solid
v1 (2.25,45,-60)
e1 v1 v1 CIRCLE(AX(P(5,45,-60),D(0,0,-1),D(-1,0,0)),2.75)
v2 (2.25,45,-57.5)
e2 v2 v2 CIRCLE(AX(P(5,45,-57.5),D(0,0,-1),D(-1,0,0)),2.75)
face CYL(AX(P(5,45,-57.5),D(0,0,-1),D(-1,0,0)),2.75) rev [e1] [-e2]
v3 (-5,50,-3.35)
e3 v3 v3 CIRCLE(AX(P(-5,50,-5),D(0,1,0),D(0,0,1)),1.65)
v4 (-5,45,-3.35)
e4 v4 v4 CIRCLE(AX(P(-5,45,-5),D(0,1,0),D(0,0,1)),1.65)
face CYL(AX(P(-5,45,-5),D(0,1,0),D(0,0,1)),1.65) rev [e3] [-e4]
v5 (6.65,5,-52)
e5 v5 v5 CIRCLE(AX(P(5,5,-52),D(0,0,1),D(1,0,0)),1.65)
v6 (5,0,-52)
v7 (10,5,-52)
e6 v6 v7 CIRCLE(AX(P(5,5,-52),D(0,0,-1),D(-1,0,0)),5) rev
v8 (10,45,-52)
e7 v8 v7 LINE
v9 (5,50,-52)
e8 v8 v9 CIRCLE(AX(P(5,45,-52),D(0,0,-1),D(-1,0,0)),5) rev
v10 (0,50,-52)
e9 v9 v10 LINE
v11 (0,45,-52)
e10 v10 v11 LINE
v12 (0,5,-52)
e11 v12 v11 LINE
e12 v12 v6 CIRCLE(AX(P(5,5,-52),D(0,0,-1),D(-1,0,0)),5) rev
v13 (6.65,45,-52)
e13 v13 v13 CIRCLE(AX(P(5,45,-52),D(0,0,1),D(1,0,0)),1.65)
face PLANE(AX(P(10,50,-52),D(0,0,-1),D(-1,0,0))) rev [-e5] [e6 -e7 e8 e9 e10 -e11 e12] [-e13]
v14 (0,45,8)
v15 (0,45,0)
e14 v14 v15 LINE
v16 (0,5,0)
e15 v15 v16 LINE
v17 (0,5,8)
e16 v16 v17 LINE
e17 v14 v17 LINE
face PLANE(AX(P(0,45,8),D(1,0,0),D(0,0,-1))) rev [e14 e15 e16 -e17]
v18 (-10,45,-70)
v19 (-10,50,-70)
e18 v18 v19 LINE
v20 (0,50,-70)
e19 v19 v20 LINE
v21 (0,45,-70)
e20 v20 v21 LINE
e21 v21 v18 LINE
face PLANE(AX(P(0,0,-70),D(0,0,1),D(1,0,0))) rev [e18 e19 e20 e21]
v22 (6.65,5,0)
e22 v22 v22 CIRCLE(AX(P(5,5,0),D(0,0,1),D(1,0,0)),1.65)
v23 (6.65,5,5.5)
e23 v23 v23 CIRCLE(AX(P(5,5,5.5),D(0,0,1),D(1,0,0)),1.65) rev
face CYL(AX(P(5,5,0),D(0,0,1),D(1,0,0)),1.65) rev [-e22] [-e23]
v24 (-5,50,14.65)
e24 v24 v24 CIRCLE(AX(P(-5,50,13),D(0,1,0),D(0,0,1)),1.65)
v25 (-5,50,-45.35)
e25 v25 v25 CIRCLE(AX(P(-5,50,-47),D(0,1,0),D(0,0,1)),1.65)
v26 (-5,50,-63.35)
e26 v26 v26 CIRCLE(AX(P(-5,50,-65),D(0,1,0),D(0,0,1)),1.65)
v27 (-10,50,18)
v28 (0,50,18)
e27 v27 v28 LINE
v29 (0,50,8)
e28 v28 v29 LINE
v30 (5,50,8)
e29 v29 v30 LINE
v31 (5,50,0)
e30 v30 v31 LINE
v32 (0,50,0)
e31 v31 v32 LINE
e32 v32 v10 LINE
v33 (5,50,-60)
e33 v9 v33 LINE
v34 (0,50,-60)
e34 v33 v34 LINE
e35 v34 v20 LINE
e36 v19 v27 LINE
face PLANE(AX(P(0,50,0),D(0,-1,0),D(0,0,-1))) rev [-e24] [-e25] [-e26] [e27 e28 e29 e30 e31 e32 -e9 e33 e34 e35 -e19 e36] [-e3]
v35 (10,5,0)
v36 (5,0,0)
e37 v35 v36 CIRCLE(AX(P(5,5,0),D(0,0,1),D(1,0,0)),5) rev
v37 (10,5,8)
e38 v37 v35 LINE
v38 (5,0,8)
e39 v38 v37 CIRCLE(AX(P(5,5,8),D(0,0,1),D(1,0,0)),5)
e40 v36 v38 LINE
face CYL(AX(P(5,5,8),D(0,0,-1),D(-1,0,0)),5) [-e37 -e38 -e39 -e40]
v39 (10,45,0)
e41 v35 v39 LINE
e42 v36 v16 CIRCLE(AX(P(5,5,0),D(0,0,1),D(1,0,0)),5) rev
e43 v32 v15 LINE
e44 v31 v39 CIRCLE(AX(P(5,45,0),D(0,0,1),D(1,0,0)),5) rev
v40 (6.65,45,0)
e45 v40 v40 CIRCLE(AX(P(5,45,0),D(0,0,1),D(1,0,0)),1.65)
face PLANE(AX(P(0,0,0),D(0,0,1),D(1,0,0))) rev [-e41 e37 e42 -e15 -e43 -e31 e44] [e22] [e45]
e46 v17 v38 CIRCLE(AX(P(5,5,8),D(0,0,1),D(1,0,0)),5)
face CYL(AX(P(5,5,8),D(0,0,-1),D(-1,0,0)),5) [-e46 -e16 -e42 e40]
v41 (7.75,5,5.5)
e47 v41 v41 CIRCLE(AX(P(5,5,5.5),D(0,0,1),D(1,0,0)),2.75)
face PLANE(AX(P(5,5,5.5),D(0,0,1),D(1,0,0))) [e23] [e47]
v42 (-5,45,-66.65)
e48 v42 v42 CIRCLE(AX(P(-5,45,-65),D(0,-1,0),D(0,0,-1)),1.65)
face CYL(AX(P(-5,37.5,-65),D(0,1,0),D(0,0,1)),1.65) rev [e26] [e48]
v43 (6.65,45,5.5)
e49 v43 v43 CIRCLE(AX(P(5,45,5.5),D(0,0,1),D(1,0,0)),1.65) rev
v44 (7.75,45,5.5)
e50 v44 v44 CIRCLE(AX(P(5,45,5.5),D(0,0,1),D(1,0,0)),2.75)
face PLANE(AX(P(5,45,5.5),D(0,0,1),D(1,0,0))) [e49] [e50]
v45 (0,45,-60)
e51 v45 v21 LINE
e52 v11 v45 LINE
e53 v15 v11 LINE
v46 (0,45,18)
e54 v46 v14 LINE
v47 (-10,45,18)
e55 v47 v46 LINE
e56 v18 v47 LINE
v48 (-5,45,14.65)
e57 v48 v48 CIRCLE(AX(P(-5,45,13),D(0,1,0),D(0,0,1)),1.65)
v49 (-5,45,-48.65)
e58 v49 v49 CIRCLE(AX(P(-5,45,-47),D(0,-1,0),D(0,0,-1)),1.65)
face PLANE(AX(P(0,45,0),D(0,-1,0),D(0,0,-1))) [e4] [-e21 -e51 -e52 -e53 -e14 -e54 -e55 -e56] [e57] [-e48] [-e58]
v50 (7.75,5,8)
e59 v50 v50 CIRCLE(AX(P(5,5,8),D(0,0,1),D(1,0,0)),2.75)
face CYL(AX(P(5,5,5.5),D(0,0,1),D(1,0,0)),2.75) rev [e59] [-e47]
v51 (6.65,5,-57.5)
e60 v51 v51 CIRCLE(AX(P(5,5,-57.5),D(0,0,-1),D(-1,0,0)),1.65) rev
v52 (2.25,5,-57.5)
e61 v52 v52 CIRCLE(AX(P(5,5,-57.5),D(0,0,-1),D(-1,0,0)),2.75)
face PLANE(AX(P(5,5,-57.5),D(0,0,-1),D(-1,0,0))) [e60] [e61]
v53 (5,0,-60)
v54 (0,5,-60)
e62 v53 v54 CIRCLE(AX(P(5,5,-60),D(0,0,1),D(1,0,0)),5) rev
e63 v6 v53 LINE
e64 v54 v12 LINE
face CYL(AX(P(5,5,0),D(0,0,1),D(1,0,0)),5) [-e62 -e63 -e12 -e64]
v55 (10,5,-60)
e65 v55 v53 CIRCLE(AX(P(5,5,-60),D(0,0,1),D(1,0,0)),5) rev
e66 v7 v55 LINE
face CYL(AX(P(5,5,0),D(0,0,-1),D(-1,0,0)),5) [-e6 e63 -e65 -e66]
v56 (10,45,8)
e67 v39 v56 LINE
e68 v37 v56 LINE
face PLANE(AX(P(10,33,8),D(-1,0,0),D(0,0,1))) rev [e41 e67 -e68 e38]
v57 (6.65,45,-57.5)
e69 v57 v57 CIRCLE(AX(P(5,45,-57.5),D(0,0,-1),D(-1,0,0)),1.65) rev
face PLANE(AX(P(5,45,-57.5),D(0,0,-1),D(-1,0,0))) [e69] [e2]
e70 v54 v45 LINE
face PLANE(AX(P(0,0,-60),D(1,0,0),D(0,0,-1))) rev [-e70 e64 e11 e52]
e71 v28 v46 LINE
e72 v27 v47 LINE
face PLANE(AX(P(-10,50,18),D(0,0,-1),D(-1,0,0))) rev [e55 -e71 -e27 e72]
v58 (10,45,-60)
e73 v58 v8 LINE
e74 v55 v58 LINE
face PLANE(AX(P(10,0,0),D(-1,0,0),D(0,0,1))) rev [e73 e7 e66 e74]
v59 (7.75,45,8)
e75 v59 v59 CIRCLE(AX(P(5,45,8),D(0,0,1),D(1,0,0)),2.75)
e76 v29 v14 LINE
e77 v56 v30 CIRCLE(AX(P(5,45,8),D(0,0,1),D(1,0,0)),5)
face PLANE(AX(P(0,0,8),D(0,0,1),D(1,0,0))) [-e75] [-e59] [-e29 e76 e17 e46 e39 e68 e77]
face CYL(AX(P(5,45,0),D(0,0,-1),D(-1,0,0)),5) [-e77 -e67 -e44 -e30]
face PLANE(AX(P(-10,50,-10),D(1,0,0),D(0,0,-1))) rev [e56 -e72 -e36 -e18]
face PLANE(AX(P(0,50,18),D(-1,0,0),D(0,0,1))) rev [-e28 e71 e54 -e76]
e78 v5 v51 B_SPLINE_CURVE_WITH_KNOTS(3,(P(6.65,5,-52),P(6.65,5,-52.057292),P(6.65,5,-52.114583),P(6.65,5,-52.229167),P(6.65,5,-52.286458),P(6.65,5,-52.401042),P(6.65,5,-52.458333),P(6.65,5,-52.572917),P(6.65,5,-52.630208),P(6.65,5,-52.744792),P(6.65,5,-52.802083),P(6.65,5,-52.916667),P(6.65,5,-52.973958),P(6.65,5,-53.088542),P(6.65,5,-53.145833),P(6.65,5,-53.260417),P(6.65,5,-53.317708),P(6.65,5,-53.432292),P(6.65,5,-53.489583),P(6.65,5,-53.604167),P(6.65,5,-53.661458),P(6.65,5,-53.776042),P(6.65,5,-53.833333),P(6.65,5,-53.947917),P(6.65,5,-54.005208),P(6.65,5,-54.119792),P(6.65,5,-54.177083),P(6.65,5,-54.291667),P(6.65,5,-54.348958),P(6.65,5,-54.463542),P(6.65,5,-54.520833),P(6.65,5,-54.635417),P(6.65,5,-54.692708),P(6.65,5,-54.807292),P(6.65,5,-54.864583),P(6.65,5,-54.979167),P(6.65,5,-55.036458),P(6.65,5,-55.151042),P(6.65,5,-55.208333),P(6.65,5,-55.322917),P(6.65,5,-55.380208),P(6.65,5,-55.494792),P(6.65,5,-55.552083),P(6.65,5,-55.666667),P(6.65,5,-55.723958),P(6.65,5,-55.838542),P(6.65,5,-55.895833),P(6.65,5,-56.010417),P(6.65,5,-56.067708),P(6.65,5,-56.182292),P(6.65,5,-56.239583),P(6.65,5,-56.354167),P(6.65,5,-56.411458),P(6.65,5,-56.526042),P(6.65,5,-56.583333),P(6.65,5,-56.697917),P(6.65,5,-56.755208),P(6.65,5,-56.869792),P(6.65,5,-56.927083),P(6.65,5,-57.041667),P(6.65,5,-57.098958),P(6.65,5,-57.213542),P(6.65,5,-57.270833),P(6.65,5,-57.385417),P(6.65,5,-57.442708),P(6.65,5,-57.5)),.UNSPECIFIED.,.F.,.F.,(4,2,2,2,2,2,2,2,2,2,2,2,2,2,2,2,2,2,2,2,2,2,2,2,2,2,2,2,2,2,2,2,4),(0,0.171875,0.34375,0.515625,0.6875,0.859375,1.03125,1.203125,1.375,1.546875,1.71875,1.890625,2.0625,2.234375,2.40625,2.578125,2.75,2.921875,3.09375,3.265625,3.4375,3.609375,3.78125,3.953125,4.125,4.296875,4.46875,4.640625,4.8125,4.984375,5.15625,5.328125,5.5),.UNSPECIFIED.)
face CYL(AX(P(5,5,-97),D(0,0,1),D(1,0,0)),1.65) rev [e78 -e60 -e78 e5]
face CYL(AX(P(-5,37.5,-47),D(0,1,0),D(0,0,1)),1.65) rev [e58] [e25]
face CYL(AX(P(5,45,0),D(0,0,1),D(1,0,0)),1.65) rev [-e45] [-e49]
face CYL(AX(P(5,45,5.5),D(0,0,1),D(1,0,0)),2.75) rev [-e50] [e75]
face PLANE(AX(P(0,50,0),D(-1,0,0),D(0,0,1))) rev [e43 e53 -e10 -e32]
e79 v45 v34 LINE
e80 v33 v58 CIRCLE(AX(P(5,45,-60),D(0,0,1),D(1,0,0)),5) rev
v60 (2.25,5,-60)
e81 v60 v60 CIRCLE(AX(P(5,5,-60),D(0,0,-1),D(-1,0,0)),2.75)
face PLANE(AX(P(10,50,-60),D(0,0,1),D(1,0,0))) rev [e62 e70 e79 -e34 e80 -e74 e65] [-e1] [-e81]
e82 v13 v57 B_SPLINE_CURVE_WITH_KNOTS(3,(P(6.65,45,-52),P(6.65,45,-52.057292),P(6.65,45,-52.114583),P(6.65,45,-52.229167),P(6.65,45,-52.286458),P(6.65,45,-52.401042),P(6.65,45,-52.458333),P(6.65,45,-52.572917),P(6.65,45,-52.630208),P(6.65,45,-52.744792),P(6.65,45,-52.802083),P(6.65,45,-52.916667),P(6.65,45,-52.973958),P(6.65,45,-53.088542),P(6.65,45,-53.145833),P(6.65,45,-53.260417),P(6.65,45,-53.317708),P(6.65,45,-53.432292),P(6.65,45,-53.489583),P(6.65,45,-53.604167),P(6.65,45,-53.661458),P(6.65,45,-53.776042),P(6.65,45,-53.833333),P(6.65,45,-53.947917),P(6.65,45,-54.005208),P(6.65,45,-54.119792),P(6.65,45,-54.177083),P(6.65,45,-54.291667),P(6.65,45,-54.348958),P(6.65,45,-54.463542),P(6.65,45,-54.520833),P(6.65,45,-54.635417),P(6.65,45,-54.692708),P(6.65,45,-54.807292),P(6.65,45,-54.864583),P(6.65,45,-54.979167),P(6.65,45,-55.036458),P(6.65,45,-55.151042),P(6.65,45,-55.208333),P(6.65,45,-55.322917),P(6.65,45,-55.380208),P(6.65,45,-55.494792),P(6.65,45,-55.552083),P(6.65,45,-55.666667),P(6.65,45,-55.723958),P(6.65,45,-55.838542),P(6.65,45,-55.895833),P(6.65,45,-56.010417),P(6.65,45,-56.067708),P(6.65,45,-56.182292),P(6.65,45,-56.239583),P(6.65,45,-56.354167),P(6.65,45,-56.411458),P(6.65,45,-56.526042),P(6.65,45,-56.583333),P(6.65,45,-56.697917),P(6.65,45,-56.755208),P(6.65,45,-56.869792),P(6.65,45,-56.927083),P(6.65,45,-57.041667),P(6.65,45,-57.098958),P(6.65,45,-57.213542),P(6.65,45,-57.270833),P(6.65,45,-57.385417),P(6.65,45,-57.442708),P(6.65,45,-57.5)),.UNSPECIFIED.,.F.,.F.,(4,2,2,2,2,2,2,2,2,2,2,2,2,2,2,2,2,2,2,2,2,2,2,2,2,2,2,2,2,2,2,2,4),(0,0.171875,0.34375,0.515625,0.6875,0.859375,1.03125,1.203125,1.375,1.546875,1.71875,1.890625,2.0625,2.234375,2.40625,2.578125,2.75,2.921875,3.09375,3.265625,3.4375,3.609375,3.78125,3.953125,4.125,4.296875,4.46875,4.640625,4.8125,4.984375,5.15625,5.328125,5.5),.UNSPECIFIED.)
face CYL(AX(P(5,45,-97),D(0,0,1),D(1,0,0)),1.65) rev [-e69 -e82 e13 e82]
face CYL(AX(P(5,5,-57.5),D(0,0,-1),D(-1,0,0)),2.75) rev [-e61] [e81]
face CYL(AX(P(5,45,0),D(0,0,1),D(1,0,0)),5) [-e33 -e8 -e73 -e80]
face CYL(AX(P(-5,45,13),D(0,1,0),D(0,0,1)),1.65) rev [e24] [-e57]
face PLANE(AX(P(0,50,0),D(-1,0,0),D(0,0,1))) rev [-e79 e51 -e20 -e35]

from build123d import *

# Parameters (mm, degrees)
P_IDAT_VYSUNUT_M1_DEPTH  = 8
SKICA2_R                 = 1.65
ODEBRAT_VYSUNUT_M1_DEPTH = 47.786750261
P_IDAT_VYSUNUT_M2_DEPTH  = 5
SKICA4_R                 = 1.65
ODEBRAT_VYSUNUT_M2_DEPTH = 5
SKICA5_R                 = 1.65
ODEBRAT_VYSUNUT_M3_DEPTH = 55.074023338
ZAOBLIT1_R               = 5
SKICA6_W                 = 2
SKICA6_H                 = 23
P_IDAT_VYSUNUT_M3_DEPTH  = 8
SKICA7_R                 = 2.75
ODEBRAT_VYSUNUT_M4_DEPTH = 2.5
SKICA8_W                 = 10
SKICA8_H                 = 5
P_IDAT_VYSUNUT_M4_DEPTH  = 60
SKICA9_W                 = 8
SKICA9_H                 = 5
P_IDAT_VYSUNUT_M5_DEPTH  = 10
SKICA10_W                = 10
SKICA10_H                = 8
P_IDAT_VYSUNUT_M6_DEPTH  = 45
ZAOBLIT2_R               = 5
SKICA11_R                = 1.65
ODEBRAT_VYSUNUT_M5_DEPTH = 45
ODEBRAT_START            = -2.5
SKICA12_R                = 2.75
ODEBRAT_VYSUNUT_M6_DEPTH = 2.5
SKICA13_R                = 1.65
ODEBRAT_VYSUNUT_M7_DEPTH = 12.5


with BuildPart() as part:
    # Skica1 → Přidat vysunutím1 (new body)
    with BuildSketch(Plane.XY):
        Polygon((0, 0), (10, 0), (10, 10), (8, 10), (8, 33), (10, 33), (10, 45), (0, 45), align=None)
    extrude(amount=P_IDAT_VYSUNUT_M1_DEPTH)

    # Skica2 → Odebrat vysunutím1 (cut, through all)
    with BuildSketch(Plane.XY.offset(8)):
        with Locations((5, 45)):
            Circle(SKICA2_R)
        with Locations((5, 5)):
            Circle(SKICA2_R)
    extrude(amount=-ODEBRAT_VYSUNUT_M1_DEPTH, mode=Mode.SUBTRACT)

    # Skica3 → Přidat vysunutím2 (add)
    with BuildSketch(Plane(origin=(0, 45, 0), x_dir=(1, 0, 0), z_dir=(0, 1, 0))):
        Polygon((0, 0), (0, 10), (-10, 10), (-10, -18), (0, -18), (0, -8), (10, -8), (10, 0), align=None)
    extrude(amount=P_IDAT_VYSUNUT_M2_DEPTH)

    # Skica4 → Odebrat vysunutím2 (cut)
    with BuildSketch(Plane(origin=(0, 50, 0), x_dir=(1, 0, 0), z_dir=(0, 1, 0))):
        with Locations(Location((-5, 5, 0), (0, 0, 270))):
            Circle(SKICA4_R)
        with Locations(Location((-5, -13, 0), (0, 0, 270))):
            Circle(SKICA4_R)
    extrude(amount=-ODEBRAT_VYSUNUT_M2_DEPTH, mode=Mode.SUBTRACT)

    # Skica5 → Odebrat vysunutím3 (cut, through all)
    with BuildSketch(Plane.XY.offset(8)):
        with Locations((5, 45)):
            Circle(SKICA5_R)
    extrude(amount=-ODEBRAT_VYSUNUT_M3_DEPTH, mode=Mode.SUBTRACT)

    # Zaoblit1
    zaoblit1_edges = [part.edges().sort_by_distance(p)[0] for p in [
        (0, 0, 4),
        (10, 0, 4),
        (10, 50, 4),
    ]]
    fillet(zaoblit1_edges, radius=ZAOBLIT1_R - 0.0001)  # a hair under: the kernel refuses the full size

    # Skica6 → Přidat vysunutím3 (add)
    with BuildSketch(Plane.XY.offset(8)):
        with Locations((9, 21.5)):
            Rectangle(SKICA6_W, SKICA6_H)
    extrude(amount=-P_IDAT_VYSUNUT_M3_DEPTH)

    # Skica7 → Odebrat vysunutím4 (cut)
    with BuildSketch(Plane.XY.offset(8)):
        with Locations((5, 5)):
            Circle(SKICA7_R)
        with Locations((5, 45)):
            Circle(SKICA7_R)
    extrude(amount=-ODEBRAT_VYSUNUT_M4_DEPTH, mode=Mode.SUBTRACT)

    # Skica8 → Přidat vysunutím4 (add)
    with BuildSketch(Plane(origin=(0, 0, -10), x_dir=(-1, 0, 0), z_dir=(0, 0, -1))):
        with Locations((5, 47.5)):
            Rectangle(SKICA8_W, SKICA8_H)
    extrude(amount=P_IDAT_VYSUNUT_M4_DEPTH)

    # Skica9 → Přidat vysunutím5 (add)
    with BuildSketch(Plane(origin=(0, 0, 0), x_dir=(0, 0, -1), z_dir=(1, 0, 0))):
        with Locations((56, 47.5)):
            Rectangle(SKICA9_W, SKICA9_H)
    extrude(amount=P_IDAT_VYSUNUT_M5_DEPTH)

    # Skica10 → Přidat vysunutím6 (add)
    with BuildSketch(Plane.XZ.offset(-45)):
        with Locations((5, -56)):
            Rectangle(SKICA10_W, SKICA10_H)
    extrude(amount=P_IDAT_VYSUNUT_M6_DEPTH)

    # Zaoblit2
    zaoblit2_edges = [part.edges().sort_by_distance(p)[0] for p in [
        (10, 50, -56),
        (10, 0, -56),
        (0, 0, -56),
    ]]
    fillet(zaoblit2_edges, radius=ZAOBLIT2_R - 0.0001)  # a hair under: the kernel refuses the full size

    # Skica11 → Odebrat vysunutím5 (cut)
    with BuildSketch(Plane.XY.offset(-52)):
        with Locations((5, 45)):
            Circle(SKICA11_R)
        with Locations((5, 5)):
            Circle(SKICA11_R)
    extrude(amount=-ODEBRAT_VYSUNUT_M5_DEPTH, mode=Mode.SUBTRACT)

    # Skica12 → Odebrat vysunutím6 (cut)
    with BuildSketch(Plane(origin=(0, 0, -60), x_dir=(-1, 0, 0), z_dir=(0, 0, -1)).offset(ODEBRAT_START)):
        with Locations(Location((-5, 45, 0), (0, 0, 180))):
            Circle(SKICA12_R)
        with Locations(Location((-5, 5, 0), (0, 0, 180))):
            Circle(SKICA12_R)
    extrude(amount=ODEBRAT_VYSUNUT_M6_DEPTH, mode=Mode.SUBTRACT)

    # Skica13 → Odebrat vysunutím7 (cut)
    with BuildSketch(Plane(origin=(0, 50, 0), x_dir=(1, 0, 0), z_dir=(0, 1, 0))):
        with Locations(Location((-5, 65, 0), (0, 0, 270))):
            Circle(SKICA13_R)
        with Locations(Location((-5, 47, 0), (0, 0, 270))):
            Circle(SKICA13_R)
    extrude(amount=-ODEBRAT_VYSUNUT_M7_DEPTH, mode=Mode.SUBTRACT)


solid = part.part
